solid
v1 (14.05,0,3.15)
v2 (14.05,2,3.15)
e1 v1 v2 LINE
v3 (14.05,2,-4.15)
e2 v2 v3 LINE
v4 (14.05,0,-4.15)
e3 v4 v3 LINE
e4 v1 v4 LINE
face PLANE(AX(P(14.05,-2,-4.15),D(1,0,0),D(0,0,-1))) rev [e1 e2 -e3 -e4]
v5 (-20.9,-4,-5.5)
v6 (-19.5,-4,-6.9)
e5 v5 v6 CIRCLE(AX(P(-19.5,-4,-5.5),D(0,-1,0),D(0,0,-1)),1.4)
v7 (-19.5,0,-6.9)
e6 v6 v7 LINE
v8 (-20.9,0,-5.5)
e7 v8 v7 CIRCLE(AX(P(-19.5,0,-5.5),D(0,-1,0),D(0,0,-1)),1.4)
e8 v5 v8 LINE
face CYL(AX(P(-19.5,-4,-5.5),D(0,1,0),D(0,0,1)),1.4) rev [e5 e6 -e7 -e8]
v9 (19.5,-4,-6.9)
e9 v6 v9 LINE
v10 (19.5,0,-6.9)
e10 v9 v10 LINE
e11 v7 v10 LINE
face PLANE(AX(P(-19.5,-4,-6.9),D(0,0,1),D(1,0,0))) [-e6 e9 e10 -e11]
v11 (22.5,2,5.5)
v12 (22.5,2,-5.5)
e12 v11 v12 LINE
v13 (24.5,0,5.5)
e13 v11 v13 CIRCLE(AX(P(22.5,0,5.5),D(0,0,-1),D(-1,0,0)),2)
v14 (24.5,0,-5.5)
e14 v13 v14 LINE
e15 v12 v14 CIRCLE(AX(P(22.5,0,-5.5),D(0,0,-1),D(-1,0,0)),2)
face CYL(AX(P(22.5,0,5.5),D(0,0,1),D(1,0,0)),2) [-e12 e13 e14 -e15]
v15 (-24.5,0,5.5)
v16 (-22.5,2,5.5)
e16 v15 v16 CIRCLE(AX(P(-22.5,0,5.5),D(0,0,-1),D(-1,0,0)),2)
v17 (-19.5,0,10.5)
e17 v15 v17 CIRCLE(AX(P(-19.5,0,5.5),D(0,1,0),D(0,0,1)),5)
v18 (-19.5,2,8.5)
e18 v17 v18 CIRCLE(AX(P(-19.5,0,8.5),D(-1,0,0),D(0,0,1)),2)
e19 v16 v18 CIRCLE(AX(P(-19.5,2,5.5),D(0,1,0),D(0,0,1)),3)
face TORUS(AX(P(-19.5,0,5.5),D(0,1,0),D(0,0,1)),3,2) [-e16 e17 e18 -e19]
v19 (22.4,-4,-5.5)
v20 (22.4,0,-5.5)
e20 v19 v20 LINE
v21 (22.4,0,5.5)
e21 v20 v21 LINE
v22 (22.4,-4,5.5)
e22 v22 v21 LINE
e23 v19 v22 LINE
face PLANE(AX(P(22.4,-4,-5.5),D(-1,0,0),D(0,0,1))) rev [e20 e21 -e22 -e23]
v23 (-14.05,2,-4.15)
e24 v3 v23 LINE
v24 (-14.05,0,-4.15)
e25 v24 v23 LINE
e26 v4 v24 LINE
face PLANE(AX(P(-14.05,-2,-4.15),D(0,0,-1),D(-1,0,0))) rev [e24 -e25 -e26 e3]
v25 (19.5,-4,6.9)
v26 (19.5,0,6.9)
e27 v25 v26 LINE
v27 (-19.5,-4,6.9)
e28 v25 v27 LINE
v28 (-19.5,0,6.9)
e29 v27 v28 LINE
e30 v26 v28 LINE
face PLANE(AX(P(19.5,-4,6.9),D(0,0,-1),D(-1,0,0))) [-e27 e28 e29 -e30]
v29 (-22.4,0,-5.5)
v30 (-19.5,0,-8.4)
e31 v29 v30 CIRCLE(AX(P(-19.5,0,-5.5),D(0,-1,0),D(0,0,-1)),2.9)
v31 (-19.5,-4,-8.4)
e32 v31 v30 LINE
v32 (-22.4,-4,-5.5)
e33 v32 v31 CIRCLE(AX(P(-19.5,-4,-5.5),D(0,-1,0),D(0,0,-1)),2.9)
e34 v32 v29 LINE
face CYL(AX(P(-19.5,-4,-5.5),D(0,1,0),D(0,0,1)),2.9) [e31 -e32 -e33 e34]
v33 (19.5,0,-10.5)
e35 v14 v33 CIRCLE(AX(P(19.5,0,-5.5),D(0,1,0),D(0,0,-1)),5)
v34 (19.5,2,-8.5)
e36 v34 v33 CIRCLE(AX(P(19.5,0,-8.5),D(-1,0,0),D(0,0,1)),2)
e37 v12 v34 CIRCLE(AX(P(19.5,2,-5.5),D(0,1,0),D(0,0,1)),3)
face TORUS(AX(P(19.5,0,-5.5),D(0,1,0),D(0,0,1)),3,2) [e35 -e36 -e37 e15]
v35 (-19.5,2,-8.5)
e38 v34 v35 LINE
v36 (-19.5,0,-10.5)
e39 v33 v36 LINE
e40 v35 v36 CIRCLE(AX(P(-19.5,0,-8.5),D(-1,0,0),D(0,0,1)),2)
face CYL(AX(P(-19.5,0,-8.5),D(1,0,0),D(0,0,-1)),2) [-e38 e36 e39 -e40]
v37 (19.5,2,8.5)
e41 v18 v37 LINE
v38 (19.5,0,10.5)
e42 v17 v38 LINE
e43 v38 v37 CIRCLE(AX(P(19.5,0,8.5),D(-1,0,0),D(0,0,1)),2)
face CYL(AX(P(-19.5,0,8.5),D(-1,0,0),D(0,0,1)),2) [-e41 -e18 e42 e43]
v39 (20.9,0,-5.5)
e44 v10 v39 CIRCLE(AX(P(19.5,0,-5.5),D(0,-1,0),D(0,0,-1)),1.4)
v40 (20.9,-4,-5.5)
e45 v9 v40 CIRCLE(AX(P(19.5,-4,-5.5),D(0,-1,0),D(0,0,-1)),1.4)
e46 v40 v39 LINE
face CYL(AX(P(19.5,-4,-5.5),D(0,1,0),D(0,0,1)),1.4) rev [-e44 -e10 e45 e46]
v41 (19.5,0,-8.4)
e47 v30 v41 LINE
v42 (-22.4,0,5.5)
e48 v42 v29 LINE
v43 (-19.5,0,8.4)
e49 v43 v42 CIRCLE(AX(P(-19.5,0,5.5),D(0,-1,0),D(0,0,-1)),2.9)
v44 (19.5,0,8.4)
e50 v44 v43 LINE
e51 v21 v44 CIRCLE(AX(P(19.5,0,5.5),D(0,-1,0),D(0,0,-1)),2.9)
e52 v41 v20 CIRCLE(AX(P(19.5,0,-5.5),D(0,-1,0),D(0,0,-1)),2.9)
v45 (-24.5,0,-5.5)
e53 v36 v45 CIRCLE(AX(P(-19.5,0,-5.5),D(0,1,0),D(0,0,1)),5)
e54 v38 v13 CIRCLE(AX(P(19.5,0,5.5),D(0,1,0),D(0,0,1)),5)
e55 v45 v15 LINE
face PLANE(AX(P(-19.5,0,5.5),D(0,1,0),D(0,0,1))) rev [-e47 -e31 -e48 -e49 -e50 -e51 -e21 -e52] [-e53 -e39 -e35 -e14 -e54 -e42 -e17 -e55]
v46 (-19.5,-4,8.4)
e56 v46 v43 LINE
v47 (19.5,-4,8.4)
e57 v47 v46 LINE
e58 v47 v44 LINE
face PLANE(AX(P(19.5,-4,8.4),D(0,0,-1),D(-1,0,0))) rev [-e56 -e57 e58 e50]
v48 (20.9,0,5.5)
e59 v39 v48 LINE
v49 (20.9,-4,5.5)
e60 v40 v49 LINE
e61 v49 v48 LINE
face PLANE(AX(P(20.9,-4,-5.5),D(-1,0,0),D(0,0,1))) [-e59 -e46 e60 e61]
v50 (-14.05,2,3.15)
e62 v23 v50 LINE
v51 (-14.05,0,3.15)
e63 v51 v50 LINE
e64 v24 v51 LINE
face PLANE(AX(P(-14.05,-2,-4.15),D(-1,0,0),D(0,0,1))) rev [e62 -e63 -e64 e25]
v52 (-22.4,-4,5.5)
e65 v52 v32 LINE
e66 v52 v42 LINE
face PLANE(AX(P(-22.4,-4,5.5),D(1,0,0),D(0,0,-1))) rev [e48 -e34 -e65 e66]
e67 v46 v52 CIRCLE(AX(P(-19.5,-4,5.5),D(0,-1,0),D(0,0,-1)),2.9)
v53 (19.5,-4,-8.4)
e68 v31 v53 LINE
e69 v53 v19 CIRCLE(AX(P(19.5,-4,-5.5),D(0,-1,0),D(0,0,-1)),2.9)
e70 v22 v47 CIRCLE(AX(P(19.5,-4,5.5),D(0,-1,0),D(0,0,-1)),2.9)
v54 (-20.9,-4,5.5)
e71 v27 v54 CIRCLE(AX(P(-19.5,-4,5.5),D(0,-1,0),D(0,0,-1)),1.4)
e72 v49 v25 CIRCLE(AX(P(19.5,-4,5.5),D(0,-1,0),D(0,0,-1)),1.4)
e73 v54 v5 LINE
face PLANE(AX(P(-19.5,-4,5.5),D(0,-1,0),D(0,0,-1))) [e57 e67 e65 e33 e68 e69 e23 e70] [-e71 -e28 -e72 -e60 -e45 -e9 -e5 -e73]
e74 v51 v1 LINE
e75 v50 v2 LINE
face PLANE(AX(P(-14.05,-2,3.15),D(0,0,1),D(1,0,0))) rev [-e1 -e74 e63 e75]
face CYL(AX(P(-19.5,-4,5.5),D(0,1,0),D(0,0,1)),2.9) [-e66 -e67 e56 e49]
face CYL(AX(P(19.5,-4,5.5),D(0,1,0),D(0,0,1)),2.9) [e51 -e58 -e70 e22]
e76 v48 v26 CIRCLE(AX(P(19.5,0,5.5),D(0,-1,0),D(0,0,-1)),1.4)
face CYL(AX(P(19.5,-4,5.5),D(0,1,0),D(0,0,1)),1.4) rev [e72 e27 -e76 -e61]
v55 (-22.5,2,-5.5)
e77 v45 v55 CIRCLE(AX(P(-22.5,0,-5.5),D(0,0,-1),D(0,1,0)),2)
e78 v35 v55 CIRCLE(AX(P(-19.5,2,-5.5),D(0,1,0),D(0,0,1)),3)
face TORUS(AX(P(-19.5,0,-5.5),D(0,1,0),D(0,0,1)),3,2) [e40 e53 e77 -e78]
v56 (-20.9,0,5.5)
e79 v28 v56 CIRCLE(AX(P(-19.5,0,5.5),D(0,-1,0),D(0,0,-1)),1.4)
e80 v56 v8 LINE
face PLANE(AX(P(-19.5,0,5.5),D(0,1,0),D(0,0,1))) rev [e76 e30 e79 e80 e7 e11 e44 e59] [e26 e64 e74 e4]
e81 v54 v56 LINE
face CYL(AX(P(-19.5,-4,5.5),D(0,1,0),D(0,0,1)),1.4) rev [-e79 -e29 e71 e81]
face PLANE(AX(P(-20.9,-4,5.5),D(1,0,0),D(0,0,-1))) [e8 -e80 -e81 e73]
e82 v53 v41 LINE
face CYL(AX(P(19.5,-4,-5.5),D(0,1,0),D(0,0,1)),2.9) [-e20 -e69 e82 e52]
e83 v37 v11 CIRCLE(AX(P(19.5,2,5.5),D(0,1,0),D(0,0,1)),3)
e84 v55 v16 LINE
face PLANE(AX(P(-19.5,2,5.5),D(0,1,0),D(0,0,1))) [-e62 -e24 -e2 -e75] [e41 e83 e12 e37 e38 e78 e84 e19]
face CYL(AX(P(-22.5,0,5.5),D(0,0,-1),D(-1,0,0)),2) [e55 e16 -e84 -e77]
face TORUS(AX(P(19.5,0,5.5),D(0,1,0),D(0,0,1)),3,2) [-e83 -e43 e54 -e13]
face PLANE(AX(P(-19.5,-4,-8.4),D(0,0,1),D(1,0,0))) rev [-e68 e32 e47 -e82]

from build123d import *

# Parameters (mm, degrees)
BOSS_EXTRUDE1_DEPTH = 2
BOSS_EXTRUDE2_DEPTH = 4
SKETCH3_W           = 28.1
SKETCH3_H           = 7.3
CUT_EXTRUDE1_DEPTH  = 4
FILLET1_R           = 2


with BuildPart() as part:
    # Sketch1 → Boss-Extrude1 (new body)
    with BuildSketch(Plane(origin=(0, 0, 0), x_dir=(1, 0, 0), z_dir=(0, 1, 0))):
        with BuildLine():
            Line((-19.5, 10.5), (19.5, 10.5))
            ThreePointArc((19.5, 10.5), (23.035533906, 9.035533906), (24.5, 5.5))
            Line((24.5, 5.5), (24.5, -5.5))
            ThreePointArc((24.5, -5.5), (23.035533906, -9.035533906), (19.5, -10.5))
            Line((19.5, -10.5), (-19.5, -10.5))
            ThreePointArc((-19.5, -10.5), (-23.035533906, -9.035533906), (-24.5, -5.5))
            Line((-24.5, -5.5), (-24.5, 5.5))
            ThreePointArc((-24.5, 5.5), (-23.035533906, 9.035533906), (-19.5, 10.5))
        make_face()
    extrude(amount=BOSS_EXTRUDE1_DEPTH)

    # Sketch2 → Boss-Extrude2 (add)
    with BuildSketch(Plane.XZ):
        with BuildLine():
            Line((-22.4, 5.5), (-22.4, -5.5))
            ThreePointArc((-22.4, -5.5), (-21.550609665, -7.550609665), (-19.5, -8.4))
            Line((-19.5, -8.4), (19.5, -8.4))
            ThreePointArc((19.5, -8.4), (21.550609665, -7.550609665), (22.4, -5.5))
            Line((22.4, -5.5), (22.4, 5.5))
            ThreePointArc((22.4, 5.5), (21.550609665, 7.550609665), (19.5, 8.4))
            Line((19.5, 8.4), (-19.5, 8.4))
            ThreePointArc((-19.5, 8.4), (-21.550609665, 7.550609665), (-22.4, 5.5))
        make_face()
        with BuildLine():
            Line((-20.9, 5.5), (-20.9, -5.5))
            ThreePointArc((-20.9, -5.5), (-20.489949494, -6.489949494), (-19.5, -6.9))
            Line((-19.5, -6.9), (19.5, -6.9))
            ThreePointArc((19.5, -6.9), (20.489949494, -6.489949494), (20.9, -5.5))
            Line((20.9, -5.5), (20.9, 5.5))
            ThreePointArc((20.9, 5.5), (20.489949494, 6.489949494), (19.5, 6.9))
            Line((19.5, 6.9), (-19.5, 6.9))
            ThreePointArc((-19.5, 6.9), (-20.489949494, 6.489949494), (-20.9, 5.5))
        make_face(mode=Mode.SUBTRACT)
    extrude(amount=BOSS_EXTRUDE2_DEPTH)

    # Sketch3 → Cut-Extrude1 (cut)
    with BuildSketch(Plane(origin=(0, 2, 0), x_dir=(1, 0, 0), z_dir=(0, 1, 0))):
        with Locations((0, 0.5)):
            Rectangle(SKETCH3_W, SKETCH3_H)
    extrude(amount=-CUT_EXTRUDE1_DEPTH, mode=Mode.SUBTRACT)

    # Fillet1
    fillet1_edges = [part.edges().sort_by_distance(p)[0] for p in [
        (-23.035533906, 2, -9.035533906),
        (0, 2, -10.5),
        (23.035533906, 2, -9.035533906),
        (24.5, 2, 0),
        (23.035533906, 2, 9.035533906),
        (0, 2, 10.5),
        (-23.035533906, 2, 9.035533906),
        (-24.5, 2, 0),
    ]]
    fillet(fillet1_edges, radius=FILLET1_R - 0.0001)  # a hair under: the kernel refuses the full size


solid = part.part
